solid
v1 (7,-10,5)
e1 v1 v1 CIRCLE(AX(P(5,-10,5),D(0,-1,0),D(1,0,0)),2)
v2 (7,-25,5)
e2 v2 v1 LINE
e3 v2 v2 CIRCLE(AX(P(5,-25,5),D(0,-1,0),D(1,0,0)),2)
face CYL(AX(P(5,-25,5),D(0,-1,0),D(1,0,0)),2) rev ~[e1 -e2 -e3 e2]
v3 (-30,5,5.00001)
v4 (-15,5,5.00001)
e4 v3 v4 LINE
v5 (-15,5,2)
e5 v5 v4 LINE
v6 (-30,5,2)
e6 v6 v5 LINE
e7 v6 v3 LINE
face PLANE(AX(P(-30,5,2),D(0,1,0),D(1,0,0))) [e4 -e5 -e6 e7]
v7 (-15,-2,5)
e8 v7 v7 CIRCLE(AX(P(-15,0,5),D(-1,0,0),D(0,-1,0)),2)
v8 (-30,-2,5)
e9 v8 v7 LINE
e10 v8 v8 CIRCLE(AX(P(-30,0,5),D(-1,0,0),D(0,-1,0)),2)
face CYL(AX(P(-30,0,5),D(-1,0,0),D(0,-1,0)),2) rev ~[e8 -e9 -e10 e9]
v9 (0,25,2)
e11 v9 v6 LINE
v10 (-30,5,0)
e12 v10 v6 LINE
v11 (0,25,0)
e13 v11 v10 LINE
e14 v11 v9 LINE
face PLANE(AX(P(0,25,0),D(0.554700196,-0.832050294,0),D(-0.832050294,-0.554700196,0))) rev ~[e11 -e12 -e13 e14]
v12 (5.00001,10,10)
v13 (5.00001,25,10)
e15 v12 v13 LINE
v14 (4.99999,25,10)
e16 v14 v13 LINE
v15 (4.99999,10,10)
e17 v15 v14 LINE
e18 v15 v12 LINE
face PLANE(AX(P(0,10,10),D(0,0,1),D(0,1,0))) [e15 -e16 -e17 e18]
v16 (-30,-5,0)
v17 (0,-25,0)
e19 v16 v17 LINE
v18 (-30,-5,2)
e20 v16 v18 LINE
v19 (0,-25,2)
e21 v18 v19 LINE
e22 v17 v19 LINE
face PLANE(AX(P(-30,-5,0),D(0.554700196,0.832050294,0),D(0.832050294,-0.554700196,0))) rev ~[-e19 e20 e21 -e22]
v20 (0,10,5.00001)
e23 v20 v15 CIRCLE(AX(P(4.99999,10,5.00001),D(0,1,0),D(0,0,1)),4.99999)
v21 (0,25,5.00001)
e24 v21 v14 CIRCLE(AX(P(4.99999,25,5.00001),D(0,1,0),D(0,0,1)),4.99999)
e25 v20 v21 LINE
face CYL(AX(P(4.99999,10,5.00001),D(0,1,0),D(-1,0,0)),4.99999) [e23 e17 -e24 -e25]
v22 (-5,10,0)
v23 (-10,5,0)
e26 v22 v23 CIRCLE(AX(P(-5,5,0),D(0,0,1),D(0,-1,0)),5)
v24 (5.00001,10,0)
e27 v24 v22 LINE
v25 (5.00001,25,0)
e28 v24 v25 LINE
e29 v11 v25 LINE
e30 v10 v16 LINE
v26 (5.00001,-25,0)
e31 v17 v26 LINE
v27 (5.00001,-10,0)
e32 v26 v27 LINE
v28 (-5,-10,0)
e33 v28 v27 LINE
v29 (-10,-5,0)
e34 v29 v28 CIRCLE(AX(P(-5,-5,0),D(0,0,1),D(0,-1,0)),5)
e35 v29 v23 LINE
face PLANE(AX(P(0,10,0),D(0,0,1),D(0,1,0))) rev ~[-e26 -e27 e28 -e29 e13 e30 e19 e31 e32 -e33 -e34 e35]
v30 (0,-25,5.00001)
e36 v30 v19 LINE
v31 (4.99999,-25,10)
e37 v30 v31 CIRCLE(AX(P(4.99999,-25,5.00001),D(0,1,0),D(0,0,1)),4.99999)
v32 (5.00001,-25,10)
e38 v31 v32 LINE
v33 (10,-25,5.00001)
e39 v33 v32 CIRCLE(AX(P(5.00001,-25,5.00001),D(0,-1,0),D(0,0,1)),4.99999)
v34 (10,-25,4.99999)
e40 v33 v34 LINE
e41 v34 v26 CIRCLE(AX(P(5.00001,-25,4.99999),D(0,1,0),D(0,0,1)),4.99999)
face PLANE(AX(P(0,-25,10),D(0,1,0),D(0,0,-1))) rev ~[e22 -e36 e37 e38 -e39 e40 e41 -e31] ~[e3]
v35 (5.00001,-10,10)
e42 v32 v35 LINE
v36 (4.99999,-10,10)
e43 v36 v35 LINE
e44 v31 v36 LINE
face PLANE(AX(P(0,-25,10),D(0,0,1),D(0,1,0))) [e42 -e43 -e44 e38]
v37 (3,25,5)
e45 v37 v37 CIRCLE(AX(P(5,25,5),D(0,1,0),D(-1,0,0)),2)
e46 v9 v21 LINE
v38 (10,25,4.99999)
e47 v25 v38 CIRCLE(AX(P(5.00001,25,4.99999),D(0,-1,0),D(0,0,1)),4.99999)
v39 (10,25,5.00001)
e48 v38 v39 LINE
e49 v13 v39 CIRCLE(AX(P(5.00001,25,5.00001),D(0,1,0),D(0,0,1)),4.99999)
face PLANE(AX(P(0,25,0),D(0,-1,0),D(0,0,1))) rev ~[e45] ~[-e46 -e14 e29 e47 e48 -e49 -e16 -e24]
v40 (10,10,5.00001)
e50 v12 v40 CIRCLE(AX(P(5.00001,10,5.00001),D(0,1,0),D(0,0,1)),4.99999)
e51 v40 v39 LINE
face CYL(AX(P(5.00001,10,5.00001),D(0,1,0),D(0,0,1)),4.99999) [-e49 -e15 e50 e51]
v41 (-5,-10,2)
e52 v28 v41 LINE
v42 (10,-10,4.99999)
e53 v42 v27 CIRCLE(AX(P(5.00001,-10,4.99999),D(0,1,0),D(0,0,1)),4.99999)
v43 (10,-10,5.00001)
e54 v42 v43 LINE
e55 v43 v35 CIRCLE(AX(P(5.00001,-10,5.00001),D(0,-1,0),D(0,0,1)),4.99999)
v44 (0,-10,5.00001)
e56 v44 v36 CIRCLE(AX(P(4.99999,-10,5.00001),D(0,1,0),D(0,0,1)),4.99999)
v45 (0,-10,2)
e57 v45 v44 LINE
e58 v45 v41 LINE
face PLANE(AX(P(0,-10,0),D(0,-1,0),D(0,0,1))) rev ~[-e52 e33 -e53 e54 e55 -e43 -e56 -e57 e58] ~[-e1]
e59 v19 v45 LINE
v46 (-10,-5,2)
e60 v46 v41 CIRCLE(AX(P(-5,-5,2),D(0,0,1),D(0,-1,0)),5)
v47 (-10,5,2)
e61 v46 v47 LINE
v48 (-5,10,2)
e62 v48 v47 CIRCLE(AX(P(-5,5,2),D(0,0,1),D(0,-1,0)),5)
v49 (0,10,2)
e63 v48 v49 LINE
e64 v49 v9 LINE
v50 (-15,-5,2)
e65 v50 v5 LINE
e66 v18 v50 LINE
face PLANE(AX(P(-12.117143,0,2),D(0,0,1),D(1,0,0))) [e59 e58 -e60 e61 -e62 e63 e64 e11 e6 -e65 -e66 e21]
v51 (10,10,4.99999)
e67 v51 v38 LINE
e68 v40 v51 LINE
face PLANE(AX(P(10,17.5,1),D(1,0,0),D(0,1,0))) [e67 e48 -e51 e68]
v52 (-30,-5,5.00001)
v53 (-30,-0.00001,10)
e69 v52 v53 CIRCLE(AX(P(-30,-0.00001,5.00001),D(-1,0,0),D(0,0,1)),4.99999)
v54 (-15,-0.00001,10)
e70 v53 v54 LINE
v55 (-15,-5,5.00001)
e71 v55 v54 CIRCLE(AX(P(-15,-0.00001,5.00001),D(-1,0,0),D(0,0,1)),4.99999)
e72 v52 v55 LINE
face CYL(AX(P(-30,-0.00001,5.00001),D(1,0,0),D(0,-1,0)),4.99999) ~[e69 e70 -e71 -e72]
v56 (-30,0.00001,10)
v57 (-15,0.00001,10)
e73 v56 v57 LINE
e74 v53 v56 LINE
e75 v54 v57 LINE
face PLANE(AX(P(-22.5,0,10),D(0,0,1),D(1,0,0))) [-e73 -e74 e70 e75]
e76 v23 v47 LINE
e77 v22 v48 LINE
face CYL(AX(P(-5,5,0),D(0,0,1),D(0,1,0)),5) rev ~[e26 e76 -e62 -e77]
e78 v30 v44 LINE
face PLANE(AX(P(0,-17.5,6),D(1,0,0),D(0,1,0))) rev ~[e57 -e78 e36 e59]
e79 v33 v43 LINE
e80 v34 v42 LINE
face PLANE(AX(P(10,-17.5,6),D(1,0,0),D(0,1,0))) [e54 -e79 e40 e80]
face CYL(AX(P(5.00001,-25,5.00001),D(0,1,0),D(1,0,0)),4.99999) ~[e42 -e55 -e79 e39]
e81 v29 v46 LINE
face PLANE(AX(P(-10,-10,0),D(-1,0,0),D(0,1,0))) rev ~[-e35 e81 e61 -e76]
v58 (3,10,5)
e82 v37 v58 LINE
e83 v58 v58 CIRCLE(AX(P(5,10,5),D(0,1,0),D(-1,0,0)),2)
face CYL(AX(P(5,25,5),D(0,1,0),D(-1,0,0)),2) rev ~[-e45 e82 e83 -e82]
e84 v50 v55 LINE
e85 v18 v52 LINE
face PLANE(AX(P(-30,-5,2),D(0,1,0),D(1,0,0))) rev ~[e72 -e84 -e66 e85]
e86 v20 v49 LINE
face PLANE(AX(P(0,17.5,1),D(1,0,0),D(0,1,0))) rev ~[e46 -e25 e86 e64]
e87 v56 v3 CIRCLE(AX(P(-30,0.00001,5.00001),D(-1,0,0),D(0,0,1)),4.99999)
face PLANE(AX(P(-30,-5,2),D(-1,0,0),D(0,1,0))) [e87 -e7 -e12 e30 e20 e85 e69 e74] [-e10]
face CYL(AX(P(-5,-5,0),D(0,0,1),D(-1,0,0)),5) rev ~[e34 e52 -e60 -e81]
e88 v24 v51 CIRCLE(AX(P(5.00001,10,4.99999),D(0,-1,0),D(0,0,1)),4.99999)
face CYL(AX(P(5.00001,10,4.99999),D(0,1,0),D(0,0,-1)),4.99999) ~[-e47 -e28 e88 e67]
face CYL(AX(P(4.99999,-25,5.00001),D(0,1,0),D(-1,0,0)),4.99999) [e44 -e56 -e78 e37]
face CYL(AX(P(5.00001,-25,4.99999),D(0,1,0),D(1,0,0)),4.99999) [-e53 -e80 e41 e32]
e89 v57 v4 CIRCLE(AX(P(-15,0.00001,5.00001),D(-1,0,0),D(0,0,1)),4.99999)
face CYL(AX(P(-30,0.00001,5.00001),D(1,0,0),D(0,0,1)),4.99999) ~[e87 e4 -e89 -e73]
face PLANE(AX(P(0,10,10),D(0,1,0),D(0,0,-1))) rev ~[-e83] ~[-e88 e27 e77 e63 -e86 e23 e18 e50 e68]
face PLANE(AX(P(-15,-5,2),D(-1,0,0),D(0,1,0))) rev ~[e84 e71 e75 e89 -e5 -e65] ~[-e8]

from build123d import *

# Parameters (mm, degrees)
F0_W      = 15
F0_H      = 3
F1_DEPTH  = 2
F2_W      = 15
F2_H      = 10
F3_DEPTH  = 8
F4_R      = 2
F5_DEPTH  = 25
F6_R      = 4.99999
F7_W      = 15
F7_H      = 8
F7_H_2    = 2
F8_DEPTH  = 10
F9_R      = 4.99999
F10_R     = 2
F11_DEPTH = 25
F12_W     = 15
F12_H     = 2
F12_H_2   = 8
F13_DEPTH = 10
F14_R     = 4.99999
F15_R     = 2
F16_DEPTH = 25
F17_R     = 5


# Not quite as in the source:
# - a fillet or chamfer is up to 0.001 mm smaller than in the source, because OpenCascade refuses the exact size


with BuildPart() as f1:
    # F0 (on Top) → F1 (new body)
    with BuildSketch(Plane.XY):
        Polygon((0, 25), (-30, 5), (-15, 5), (-15, 2), (-15, -2), (-15, -5), (-30, -5), (0, -25), (0, -10), (-10, -10), (-10, 10), (0, 10), align=None)
        with Locations((-22.5, 3.5)):
            Rectangle(F0_W, F0_H)
        Polygon((-30, 2), (-30, 0), (-30, -2), (-15, -2), (-15, 2), align=None)
        with Locations((-22.5, -3.5)):
            Rectangle(F0_W, F0_H)
    extrude(amount=F1_DEPTH)

    # F2 (on face) → F3 (join)
    with BuildSketch(Plane.XY.offset(2)):
        with Locations((-22.5, 0)):
            Rectangle(F2_W, F2_H)
    extrude(amount=F3_DEPTH)

    # F4 (on face) → F5 (cut)
    with BuildSketch(Plane(origin=(-30, 0, 0), x_dir=(0, -1, 0), z_dir=(-1, 0, 0))):
        with Locations((0, 5)):
            Circle(F4_R)
    extrude(amount=-F5_DEPTH, mode=Mode.SUBTRACT)

    # F6 (radius 5 in the source; OpenCascade refuses exactly that, so slightly less here)
    f6_edges = [f1.edges().sort_by_distance(p)[0] for p in [
        (-22.5, -5, 10),
        (-22.5, 5, 10),
    ]]
    fillet(f6_edges, radius=F6_R)

    # F7 (on face) → F8 (join)
    with BuildSketch(Plane.YZ):
        with Locations((-17.5, 6)):
            Rectangle(F7_W, F7_H)
        with Locations((-17.5, 1)):
            Rectangle(F7_W, F7_H_2)
    extrude(amount=F8_DEPTH)

    # F9 (radius 5 in the source; OpenCascade refuses exactly that, so slightly less here)
    f9_edges = [f1.edges().sort_by_distance(p)[0] for p in [
        (0, -17.5, 10),
        (10, -17.5, 10),
        (10, -17.5, 0),
    ]]
    fillet(f9_edges, radius=F9_R)

    # F10 (on face) → F11 (cut)
    with BuildSketch(Plane.XZ.offset(25)):
        with Locations((5, 5)):
            Circle(F10_R)
    extrude(amount=-F11_DEPTH, mode=Mode.SUBTRACT)

    # F12 (on face) → F13 (join)
    with BuildSketch(Plane.YZ):
        with Locations((17.5, 1)):
            Rectangle(F12_W, F12_H)
        with Locations((17.5, 6)):
            Rectangle(F12_W, F12_H_2)
    extrude(amount=F13_DEPTH)

    # F14 (radius 5 in the source; OpenCascade refuses exactly that, so slightly less here)
    f14_edges = [f1.edges().sort_by_distance(p)[0] for p in [
        (0, 17.5, 10),
        (10, 17.5, 10),
        (10, 17.5, 0),
    ]]
    fillet(f14_edges, radius=F14_R)

    # F15 (on face) → F16 (cut)
    with BuildSketch(Plane(origin=(0, 25, 0), x_dir=(-1, 0, 0), z_dir=(0, 1, 0))):
        with Locations((-5, 5)):
            Circle(F15_R)
    extrude(amount=-F16_DEPTH, mode=Mode.SUBTRACT)

    # F17
    f17_edges = [f1.edges().sort_by_distance(p)[0] for p in [
        (-10, 10, 1),
        (-10, -10, 1),
    ]]
    fillet(f17_edges, radius=F17_R)


solid = f1.part
